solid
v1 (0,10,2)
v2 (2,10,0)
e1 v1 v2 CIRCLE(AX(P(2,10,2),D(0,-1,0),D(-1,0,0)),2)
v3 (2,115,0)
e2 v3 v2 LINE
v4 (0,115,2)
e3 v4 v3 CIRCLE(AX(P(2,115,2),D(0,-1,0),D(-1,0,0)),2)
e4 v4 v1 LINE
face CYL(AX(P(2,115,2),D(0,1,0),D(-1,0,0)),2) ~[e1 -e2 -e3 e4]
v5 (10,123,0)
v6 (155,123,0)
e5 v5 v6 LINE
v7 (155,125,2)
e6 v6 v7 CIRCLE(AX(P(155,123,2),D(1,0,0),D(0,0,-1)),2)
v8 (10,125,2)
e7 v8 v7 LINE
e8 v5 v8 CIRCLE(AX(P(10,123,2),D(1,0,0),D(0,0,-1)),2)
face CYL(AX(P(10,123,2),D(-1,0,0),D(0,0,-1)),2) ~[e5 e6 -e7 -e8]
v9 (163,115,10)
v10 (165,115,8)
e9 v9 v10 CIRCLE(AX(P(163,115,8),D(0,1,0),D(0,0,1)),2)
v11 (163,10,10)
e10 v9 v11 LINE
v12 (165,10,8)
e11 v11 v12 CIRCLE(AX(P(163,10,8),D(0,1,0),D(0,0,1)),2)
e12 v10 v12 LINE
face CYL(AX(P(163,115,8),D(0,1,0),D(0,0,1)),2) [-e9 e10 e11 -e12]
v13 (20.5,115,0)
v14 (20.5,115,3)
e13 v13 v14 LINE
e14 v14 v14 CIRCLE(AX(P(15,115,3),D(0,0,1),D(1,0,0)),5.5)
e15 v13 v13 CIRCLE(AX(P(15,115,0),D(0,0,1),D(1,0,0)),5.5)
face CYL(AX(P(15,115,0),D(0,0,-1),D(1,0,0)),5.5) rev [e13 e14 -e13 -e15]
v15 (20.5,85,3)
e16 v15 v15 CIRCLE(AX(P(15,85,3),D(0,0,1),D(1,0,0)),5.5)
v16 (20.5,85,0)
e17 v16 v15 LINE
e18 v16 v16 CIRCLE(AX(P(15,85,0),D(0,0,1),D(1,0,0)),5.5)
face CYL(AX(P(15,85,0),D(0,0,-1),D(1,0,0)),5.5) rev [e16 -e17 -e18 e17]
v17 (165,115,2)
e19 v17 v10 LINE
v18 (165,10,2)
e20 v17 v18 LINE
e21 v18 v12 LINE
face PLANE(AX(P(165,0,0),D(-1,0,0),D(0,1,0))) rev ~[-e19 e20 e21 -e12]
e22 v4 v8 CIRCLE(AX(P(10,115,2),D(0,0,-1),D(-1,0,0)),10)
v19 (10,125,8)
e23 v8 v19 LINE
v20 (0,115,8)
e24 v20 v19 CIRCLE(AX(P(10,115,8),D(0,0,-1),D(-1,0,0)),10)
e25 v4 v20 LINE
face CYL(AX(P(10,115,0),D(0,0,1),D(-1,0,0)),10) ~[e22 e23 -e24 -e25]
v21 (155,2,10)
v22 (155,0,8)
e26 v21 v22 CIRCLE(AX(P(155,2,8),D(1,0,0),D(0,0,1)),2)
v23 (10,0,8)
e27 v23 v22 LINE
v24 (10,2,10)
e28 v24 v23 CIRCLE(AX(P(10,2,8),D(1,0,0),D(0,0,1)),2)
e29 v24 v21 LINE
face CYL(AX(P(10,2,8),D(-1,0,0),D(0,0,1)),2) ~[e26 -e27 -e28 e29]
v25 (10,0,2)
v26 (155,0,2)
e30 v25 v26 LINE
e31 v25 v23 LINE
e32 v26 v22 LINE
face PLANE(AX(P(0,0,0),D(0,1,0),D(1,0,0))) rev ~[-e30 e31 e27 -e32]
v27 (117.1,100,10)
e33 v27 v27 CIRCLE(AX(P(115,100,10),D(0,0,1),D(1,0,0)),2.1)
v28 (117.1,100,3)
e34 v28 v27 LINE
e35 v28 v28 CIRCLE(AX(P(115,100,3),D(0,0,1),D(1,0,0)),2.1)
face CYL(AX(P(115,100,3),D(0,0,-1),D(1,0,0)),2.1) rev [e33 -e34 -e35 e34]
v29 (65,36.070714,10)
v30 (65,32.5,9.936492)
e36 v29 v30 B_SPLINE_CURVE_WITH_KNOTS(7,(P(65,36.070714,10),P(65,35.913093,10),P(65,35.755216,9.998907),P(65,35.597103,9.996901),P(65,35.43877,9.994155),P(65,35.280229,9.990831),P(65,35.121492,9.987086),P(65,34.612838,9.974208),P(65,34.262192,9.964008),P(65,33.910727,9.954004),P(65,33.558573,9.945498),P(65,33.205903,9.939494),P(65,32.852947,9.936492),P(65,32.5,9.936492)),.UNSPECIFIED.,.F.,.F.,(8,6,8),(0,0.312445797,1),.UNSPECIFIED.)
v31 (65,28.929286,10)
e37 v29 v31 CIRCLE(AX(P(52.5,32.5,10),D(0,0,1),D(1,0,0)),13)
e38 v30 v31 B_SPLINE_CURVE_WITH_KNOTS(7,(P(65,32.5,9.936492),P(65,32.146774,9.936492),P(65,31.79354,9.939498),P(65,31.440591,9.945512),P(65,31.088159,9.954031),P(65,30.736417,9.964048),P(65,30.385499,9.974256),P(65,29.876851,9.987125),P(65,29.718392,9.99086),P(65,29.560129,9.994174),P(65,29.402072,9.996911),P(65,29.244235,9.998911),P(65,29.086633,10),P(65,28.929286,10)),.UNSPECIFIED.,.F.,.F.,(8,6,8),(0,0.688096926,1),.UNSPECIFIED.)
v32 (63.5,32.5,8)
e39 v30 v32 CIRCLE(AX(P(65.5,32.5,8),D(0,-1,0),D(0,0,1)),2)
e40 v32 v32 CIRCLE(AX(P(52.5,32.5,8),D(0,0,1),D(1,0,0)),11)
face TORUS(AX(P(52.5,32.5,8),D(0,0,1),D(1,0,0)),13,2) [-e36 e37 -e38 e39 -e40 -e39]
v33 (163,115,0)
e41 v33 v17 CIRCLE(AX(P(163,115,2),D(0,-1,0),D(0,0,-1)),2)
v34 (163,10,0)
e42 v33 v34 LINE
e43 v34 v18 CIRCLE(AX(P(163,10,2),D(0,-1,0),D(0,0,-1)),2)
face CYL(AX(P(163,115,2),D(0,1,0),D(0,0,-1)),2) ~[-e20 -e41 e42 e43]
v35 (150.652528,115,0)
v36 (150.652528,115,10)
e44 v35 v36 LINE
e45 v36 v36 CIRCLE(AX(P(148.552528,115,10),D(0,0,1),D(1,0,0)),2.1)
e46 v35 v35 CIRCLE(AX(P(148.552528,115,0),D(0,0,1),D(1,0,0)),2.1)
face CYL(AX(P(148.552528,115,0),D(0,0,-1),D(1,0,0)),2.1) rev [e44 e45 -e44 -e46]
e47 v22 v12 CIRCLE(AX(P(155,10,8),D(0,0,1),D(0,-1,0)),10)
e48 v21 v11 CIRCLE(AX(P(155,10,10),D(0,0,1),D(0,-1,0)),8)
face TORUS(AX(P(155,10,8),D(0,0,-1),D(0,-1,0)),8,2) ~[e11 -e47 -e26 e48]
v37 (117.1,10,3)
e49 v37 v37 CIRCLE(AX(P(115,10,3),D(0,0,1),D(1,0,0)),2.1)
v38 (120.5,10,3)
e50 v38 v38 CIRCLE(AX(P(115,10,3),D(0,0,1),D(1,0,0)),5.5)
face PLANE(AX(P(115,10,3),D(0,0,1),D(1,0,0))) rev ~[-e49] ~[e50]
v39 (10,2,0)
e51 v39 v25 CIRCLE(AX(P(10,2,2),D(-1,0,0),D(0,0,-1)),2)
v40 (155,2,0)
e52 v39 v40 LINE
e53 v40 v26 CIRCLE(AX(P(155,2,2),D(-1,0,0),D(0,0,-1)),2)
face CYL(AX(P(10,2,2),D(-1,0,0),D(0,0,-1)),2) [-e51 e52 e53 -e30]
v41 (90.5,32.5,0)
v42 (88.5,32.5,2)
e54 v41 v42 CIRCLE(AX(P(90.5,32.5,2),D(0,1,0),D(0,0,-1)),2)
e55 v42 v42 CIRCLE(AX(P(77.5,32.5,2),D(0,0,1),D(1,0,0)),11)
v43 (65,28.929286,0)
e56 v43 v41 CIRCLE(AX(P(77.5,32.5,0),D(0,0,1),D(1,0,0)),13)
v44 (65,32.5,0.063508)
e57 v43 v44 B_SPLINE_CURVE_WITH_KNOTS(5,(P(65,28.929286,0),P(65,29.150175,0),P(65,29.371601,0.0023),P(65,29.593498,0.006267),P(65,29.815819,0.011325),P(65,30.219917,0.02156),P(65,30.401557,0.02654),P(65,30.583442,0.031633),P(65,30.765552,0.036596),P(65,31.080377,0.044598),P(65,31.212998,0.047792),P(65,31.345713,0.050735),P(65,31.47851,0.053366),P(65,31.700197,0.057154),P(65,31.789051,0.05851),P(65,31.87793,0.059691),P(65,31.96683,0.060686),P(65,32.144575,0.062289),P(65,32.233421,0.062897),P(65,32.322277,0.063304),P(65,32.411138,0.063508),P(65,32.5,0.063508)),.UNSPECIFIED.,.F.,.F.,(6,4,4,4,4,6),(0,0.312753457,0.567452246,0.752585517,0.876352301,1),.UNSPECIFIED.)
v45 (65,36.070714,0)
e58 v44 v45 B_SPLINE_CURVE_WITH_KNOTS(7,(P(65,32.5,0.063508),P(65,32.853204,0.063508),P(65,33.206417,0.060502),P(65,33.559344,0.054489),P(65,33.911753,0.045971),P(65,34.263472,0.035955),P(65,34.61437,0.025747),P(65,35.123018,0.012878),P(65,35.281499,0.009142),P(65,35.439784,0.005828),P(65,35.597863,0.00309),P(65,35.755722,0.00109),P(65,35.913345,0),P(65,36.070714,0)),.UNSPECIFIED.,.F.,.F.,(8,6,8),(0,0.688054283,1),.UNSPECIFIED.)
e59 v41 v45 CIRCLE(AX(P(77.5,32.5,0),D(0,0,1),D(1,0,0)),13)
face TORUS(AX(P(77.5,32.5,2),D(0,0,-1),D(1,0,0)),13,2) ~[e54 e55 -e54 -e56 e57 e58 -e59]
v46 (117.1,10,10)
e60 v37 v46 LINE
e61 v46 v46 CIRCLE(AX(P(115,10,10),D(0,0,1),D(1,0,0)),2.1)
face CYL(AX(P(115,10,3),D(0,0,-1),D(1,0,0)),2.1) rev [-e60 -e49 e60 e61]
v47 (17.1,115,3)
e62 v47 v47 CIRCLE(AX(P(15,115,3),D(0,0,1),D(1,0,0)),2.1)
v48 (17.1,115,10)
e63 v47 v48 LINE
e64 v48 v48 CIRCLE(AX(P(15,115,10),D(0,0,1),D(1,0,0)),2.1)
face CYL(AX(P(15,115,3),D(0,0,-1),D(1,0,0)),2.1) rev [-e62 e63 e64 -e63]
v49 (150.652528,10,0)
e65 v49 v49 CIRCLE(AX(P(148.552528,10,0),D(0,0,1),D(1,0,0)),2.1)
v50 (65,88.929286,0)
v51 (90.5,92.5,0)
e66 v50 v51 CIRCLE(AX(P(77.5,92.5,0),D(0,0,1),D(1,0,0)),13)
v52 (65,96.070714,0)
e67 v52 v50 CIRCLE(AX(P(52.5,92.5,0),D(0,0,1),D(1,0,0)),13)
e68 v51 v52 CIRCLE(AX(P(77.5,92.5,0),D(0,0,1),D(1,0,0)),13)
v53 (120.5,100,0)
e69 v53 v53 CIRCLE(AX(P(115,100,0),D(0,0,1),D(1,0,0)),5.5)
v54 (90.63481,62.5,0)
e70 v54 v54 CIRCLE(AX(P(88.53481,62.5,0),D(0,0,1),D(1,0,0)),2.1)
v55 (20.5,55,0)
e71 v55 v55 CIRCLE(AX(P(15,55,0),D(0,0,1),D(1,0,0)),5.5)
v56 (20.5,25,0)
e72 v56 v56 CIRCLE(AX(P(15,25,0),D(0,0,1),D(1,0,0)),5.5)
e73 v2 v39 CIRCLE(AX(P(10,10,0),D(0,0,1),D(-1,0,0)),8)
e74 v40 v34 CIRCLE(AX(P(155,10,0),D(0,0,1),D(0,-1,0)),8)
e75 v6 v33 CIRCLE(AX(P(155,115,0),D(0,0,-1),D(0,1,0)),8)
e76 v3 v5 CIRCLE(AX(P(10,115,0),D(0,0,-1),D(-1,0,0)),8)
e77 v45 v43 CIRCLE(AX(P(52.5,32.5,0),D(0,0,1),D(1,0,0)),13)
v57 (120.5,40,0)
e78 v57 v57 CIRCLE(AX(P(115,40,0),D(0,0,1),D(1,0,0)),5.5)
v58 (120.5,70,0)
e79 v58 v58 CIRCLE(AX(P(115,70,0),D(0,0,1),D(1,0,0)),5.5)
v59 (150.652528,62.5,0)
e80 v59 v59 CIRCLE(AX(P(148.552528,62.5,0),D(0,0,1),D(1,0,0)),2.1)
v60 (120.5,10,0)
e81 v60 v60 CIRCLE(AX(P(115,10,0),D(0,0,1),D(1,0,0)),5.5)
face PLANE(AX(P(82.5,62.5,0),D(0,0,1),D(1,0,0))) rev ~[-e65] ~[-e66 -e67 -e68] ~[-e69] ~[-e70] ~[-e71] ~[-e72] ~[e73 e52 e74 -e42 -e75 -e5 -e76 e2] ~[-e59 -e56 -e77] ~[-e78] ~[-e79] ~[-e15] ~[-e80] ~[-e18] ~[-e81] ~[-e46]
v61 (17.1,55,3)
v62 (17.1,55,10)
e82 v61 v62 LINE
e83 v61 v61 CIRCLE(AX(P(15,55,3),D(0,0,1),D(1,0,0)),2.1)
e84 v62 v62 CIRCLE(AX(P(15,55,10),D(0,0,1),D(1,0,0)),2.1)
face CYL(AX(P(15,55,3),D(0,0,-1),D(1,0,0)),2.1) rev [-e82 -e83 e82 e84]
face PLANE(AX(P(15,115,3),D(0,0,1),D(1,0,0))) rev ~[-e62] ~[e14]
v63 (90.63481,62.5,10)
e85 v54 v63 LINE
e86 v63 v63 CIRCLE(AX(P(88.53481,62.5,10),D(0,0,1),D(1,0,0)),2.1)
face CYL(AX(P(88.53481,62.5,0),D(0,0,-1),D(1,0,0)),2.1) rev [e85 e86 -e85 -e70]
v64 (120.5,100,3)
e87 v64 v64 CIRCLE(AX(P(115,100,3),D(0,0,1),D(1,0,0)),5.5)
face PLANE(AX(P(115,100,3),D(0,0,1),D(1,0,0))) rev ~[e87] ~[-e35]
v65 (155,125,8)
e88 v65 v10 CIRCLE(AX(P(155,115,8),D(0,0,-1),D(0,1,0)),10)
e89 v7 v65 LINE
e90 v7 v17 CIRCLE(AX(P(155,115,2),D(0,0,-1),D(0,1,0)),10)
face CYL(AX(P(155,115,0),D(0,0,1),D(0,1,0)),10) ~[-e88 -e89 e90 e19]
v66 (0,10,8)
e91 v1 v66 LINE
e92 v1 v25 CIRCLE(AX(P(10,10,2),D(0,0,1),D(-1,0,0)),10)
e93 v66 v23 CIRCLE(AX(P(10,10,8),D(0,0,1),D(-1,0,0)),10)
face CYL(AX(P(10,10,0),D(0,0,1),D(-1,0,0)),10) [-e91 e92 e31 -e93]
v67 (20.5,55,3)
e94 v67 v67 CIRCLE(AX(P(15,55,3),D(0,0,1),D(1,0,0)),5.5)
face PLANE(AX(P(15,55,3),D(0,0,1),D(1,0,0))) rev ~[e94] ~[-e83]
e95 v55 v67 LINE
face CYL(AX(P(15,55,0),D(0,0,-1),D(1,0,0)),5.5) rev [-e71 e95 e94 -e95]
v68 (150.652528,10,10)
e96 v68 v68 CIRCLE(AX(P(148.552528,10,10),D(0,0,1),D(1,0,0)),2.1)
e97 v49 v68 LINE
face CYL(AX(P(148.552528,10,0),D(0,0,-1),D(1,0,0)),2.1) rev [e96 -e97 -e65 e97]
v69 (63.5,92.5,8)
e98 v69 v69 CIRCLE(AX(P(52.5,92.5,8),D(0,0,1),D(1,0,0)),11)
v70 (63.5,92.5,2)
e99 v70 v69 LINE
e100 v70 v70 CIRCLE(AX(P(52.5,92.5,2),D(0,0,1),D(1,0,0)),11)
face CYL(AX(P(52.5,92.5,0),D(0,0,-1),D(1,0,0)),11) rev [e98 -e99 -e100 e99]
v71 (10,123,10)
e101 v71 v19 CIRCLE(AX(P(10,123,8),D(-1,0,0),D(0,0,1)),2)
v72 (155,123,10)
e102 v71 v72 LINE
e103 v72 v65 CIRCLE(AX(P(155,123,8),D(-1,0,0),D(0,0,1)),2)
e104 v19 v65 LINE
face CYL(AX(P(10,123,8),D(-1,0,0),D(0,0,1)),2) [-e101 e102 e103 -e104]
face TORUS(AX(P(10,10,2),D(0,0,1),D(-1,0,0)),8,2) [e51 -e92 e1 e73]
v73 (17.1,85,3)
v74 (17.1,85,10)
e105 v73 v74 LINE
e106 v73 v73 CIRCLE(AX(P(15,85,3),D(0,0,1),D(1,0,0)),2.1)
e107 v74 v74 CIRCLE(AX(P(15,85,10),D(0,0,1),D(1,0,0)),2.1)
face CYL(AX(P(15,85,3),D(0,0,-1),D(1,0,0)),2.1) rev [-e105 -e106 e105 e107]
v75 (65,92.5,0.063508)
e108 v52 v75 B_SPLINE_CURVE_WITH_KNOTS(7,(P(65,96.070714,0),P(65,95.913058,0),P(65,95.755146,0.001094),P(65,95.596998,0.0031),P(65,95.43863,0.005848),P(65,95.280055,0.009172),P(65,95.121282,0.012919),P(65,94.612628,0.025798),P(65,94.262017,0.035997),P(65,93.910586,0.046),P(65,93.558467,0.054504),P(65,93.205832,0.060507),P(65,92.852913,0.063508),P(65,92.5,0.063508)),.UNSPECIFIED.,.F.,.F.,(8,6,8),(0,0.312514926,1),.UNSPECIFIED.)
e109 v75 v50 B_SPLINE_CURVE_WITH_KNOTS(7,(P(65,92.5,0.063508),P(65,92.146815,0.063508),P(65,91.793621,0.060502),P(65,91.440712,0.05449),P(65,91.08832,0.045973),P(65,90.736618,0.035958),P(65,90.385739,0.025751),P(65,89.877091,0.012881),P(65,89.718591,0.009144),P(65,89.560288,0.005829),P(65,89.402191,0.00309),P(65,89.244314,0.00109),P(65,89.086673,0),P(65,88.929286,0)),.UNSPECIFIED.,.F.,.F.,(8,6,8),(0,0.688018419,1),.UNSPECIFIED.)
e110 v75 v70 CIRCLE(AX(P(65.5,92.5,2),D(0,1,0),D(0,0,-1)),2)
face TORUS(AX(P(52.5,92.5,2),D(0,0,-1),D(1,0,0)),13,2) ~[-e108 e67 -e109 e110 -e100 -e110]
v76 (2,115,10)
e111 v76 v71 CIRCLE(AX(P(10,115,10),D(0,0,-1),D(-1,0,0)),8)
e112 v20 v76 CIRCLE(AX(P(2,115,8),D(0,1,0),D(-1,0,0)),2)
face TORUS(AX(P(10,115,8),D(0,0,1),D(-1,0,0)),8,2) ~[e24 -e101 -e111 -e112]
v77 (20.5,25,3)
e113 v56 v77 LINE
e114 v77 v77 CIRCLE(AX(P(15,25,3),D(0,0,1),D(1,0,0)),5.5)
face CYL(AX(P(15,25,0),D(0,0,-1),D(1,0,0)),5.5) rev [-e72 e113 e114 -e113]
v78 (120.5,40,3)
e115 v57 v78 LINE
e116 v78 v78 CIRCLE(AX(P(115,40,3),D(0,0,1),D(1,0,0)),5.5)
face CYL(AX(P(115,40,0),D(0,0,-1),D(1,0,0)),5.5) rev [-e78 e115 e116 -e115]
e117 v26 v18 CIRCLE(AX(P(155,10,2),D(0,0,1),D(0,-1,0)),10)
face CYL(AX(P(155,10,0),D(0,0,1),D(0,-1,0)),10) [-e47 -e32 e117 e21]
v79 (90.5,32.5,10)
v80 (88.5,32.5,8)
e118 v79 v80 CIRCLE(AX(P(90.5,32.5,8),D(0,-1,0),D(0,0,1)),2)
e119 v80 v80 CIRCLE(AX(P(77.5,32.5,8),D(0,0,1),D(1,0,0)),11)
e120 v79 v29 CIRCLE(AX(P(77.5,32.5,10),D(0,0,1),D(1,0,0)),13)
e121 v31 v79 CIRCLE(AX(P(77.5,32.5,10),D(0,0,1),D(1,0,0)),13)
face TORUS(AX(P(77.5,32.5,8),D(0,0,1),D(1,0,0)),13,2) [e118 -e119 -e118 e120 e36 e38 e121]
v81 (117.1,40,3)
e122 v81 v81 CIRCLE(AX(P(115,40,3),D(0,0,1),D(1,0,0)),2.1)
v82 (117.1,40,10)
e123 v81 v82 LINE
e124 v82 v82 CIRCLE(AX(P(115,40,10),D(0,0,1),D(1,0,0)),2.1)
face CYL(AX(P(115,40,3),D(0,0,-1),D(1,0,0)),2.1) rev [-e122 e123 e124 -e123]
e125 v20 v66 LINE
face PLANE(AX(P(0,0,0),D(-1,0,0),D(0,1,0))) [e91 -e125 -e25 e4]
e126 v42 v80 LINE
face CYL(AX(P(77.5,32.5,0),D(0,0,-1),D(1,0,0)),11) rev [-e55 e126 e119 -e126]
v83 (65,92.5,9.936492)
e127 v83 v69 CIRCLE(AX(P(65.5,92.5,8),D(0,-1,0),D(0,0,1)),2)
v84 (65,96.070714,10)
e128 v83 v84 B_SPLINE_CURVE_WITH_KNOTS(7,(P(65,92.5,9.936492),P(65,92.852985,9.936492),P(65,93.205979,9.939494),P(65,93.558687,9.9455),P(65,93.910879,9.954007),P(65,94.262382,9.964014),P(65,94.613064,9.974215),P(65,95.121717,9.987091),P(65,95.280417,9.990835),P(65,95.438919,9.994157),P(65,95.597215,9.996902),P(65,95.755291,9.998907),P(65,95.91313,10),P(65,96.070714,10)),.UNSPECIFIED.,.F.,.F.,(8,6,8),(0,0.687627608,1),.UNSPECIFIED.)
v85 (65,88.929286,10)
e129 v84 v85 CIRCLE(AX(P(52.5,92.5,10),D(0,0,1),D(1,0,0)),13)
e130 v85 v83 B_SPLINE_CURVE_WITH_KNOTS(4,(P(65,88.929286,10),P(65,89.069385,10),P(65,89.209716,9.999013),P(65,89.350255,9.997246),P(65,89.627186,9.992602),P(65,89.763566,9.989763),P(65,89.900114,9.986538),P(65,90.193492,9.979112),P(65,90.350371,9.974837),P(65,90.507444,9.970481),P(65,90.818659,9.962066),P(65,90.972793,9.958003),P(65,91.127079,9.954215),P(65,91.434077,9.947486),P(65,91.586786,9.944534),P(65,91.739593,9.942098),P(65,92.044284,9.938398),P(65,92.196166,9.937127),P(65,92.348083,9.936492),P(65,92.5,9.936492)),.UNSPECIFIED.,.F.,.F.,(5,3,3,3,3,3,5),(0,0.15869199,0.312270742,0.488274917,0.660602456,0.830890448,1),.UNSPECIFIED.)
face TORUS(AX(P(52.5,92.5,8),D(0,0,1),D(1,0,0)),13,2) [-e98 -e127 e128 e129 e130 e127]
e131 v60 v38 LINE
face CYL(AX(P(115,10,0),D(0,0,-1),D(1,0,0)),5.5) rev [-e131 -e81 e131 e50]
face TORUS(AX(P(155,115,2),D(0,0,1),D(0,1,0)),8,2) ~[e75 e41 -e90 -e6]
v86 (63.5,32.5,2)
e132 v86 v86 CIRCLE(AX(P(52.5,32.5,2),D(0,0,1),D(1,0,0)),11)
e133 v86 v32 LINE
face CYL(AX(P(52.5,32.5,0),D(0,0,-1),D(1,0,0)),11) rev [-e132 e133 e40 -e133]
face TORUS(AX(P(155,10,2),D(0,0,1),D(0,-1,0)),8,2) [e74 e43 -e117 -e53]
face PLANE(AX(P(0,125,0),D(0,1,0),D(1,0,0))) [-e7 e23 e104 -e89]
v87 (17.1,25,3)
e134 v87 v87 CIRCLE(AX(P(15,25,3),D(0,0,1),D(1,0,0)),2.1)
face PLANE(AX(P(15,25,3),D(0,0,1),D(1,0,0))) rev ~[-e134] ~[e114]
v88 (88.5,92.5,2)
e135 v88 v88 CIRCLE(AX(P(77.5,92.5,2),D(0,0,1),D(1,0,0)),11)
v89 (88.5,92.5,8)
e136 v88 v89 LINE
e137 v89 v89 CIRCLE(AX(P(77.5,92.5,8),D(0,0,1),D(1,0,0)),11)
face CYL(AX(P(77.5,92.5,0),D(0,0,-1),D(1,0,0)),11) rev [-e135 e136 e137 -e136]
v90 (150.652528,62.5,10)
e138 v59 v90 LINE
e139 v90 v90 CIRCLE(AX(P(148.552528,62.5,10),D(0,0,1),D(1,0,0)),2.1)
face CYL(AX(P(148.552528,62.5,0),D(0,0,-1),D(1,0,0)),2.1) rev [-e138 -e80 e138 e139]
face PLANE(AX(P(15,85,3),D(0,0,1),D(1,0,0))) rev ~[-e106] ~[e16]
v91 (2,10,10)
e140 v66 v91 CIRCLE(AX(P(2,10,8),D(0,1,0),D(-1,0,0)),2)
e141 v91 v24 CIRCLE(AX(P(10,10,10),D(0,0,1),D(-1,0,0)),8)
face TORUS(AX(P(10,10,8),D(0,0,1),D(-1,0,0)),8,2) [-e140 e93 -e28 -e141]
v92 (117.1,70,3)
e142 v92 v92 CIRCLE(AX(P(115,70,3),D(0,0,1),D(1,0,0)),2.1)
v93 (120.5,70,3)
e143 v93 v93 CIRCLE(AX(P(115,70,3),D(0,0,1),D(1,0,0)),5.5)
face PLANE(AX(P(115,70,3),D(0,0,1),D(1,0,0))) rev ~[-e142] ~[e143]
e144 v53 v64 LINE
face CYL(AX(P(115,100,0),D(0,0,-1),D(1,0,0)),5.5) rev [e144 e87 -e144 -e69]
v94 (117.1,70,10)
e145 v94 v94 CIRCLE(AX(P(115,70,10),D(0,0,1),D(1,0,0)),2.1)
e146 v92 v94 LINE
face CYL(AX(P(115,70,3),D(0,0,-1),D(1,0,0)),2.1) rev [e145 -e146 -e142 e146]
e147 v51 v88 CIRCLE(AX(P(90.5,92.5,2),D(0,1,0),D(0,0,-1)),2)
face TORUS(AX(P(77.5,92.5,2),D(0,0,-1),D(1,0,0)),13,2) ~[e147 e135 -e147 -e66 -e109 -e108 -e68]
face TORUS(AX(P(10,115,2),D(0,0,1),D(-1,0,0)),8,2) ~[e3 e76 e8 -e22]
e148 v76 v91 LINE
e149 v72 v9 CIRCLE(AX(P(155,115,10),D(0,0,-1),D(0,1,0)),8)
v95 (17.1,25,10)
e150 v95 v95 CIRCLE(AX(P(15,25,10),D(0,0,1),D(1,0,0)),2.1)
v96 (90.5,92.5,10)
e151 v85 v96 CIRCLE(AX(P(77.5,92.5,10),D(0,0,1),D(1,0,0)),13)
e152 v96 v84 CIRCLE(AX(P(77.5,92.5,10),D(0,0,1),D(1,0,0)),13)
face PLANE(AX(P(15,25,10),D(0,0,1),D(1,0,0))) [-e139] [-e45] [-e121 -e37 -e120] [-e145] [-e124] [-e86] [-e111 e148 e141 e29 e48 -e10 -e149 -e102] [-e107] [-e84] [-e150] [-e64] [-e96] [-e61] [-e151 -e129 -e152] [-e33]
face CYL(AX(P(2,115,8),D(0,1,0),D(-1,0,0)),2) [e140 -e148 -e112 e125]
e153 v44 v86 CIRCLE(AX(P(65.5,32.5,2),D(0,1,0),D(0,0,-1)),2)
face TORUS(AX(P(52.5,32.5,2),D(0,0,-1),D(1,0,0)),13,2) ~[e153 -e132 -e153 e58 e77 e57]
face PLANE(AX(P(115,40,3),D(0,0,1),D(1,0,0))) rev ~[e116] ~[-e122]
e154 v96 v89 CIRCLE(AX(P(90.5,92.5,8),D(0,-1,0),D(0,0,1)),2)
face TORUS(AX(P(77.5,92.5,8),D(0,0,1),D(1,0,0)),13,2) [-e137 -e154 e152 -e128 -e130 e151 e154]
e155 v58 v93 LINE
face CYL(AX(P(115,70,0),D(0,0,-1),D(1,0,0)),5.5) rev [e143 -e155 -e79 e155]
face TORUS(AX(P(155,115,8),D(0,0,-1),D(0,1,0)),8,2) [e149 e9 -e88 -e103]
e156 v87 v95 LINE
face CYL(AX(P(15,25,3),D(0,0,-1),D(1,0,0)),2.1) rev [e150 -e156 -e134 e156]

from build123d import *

# Parameters (mm, degrees)
F0_W         = 165
F0_H         = 125
F0_R         = 5.5
F0_R_2       = 11
F0_R_3       = 2.1
F1_DEPTH     = 10
F2_START     = 3
F2_DEPTH     = 7
F3_R         = 10
F4_T1_DEPTH  = 145
F4_T3_DEPTH  = 105
F4_T22_ANGLE = 90
F4_T24_ANGLE = 90
F4_T26_ANGLE = 90
F4_T28_ANGLE = 90
F4_T30_ANGLE = 90
F4_T32_ANGLE = 90
F4_T34_ANGLE = 90
F4_T36_ANGLE = 90


# Not quite as in the source:
# - a fillet or chamfer that OpenCascade refuses, or shapes differently, is made with other operations: its cross-section is extruded or revolved along the edge and cut away or added


with BuildPart() as f1:
    # F0 (on Top) → F1 (new body)
    with BuildSketch(Plane.XY):
        with Locations((82.5, 62.5)):
            Rectangle(F0_W, F0_H)
        with Locations((15, 25)):
            Circle(F0_R, mode=Mode.SUBTRACT)
        with Locations((15, 55)):
            Circle(F0_R, mode=Mode.SUBTRACT)
        with Locations((52.5, 32.5)):
            Circle(F0_R_2, mode=Mode.SUBTRACT)
        with Locations((77.5, 32.5)):
            Circle(F0_R_2, mode=Mode.SUBTRACT)
        with Locations((115, 10)):
            Circle(F0_R, mode=Mode.SUBTRACT)
        with Locations((148.5525276512, 10)):
            Circle(F0_R_3, mode=Mode.SUBTRACT)
        with Locations((115, 40)):
            Circle(F0_R, mode=Mode.SUBTRACT)
        with Locations((15, 85)):
            Circle(F0_R, mode=Mode.SUBTRACT)
        with Locations((52.5, 92.5)):
            Circle(F0_R_2, mode=Mode.SUBTRACT)
        with Locations((77.5, 92.5)):
            Circle(F0_R_2, mode=Mode.SUBTRACT)
        with Locations((15, 115)):
            Circle(F0_R, mode=Mode.SUBTRACT)
        with Locations((88.534809649, 62.5)):
            Circle(F0_R_3, mode=Mode.SUBTRACT)
        with Locations((115, 70)):
            Circle(F0_R, mode=Mode.SUBTRACT)
        with Locations((148.5525276512, 62.5)):
            Circle(F0_R_3, mode=Mode.SUBTRACT)
        with Locations((115, 100)):
            Circle(F0_R, mode=Mode.SUBTRACT)
        with Locations((148.5525276512, 115)):
            Circle(F0_R_3, mode=Mode.SUBTRACT)
    extrude(amount=F1_DEPTH)

    # F0 (on Top) → F2 (join)
    with BuildSketch(Plane.XY.offset(F2_START)):
        with Locations((15, 25)):
            Circle(F0_R)
        with Locations((15, 25)):
            Circle(F0_R_3, mode=Mode.SUBTRACT)
        with Locations((15, 55)):
            Circle(F0_R)
        with Locations((15, 55)):
            Circle(F0_R_3, mode=Mode.SUBTRACT)
        with Locations((115, 10)):
            Circle(F0_R)
        with Locations((115, 10)):
            Circle(F0_R_3, mode=Mode.SUBTRACT)
        with Locations((115, 40)):
            Circle(F0_R)
        with Locations((115, 40)):
            Circle(F0_R_3, mode=Mode.SUBTRACT)
        with Locations((115, 100)):
            Circle(F0_R)
        with Locations((115, 100)):
            Circle(F0_R_3, mode=Mode.SUBTRACT)
        with Locations((115, 70)):
            Circle(F0_R)
        with Locations((115, 70)):
            Circle(F0_R_3, mode=Mode.SUBTRACT)
        with Locations((15, 85)):
            Circle(F0_R)
        with Locations((15, 85)):
            Circle(F0_R_3, mode=Mode.SUBTRACT)
        with Locations((15, 115)):
            Circle(F0_R)
        with Locations((15, 115)):
            Circle(F0_R_3, mode=Mode.SUBTRACT)
    extrude(amount=F2_DEPTH)

    # F3
    f3_edges = [f1.edges().sort_by_distance(p)[0] for p in [
        (165, 0, 5),
        (165, 125, 5),
        (0, 125, 5),
        (0, 0, 5),
    ]]
    fillet(f3_edges, radius=F3_R)

    # F4: fillet of radius 2 on 20 edges, made by hand

    # F4_s2 → F4_t1 (cut)
    with BuildSketch(Plane.YZ.offset(10)):
        with BuildLine():
            ThreePointArc((2, 10), (0.5857864376, 9.4142135624), (0, 8))
            Line((0, 8), (0, 10))
            Line((0, 10), (2, 10))
        make_face()
        with BuildLine():
            ThreePointArc((2, 0), (0.5857864376, 0.5857864376), (0, 2))
            Line((0, 2), (0, 0))
            Line((0, 0), (2, 0))
        make_face()
        with BuildLine():
            ThreePointArc((123, 10), (124.4142135624, 9.4142135624), (125, 8))
            Line((125, 8), (125, 10))
            Line((125, 10), (123, 10))
        make_face()
        with BuildLine():
            ThreePointArc((123, 0), (124.4142135624, 0.5857864376), (125, 2))
            Line((125, 2), (125, 0))
            Line((125, 0), (123, 0))
        make_face()
    extrude(amount=F4_T1_DEPTH, mode=Mode.SUBTRACT)

    # F4_s4 → F4_t3 (cut)
    with BuildSketch(Plane.XZ.offset(-115)):
        with BuildLine():
            ThreePointArc((0, 8), (0.5857864376, 9.4142135624), (2, 10))
            Line((2, 10), (0, 10))
            Line((0, 10), (0, 8))
        make_face()
        with BuildLine():
            ThreePointArc((163, 10), (164.4142135624, 9.4142135624), (165, 8))
            Line((165, 8), (165, 10))
            Line((165, 10), (163, 10))
        make_face()
        with BuildLine():
            ThreePointArc((163, 0), (164.4142135624, 0.5857864376), (165, 2))
            Line((165, 2), (165, 0))
            Line((165, 0), (163, 0))
        make_face()
        with BuildLine():
            ThreePointArc((0, 2), (0.5857864376, 0.5857864376), (2, 0))
            Line((2, 0), (0, 0))
            Line((0, 0), (0, 2))
        make_face()
    extrude(amount=F4_T3_DEPTH, mode=Mode.SUBTRACT)

    # F4_s5 → F4_t6 (revolve, cut)
    with BuildSketch(Plane.XZ.offset(-32.5)):
        with BuildLine():
            ThreePointArc((65.5, 0), (64.0857864376, 0.5857864376), (63.5, 2))
            Line((63.5, 2), (63.5, 0))
            Line((63.5, 0), (65.5, 0))
        make_face()
    revolve(axis=Axis((52.5, 32.5, 0), (0, 0, 1)), mode=Mode.SUBTRACT)

    # F4_s7 → F4_t8 (revolve, cut)
    with BuildSketch(Plane.XZ.offset(-32.5)):
        with BuildLine():
            ThreePointArc((65.5, 10), (64.0857864376, 9.4142135624), (63.5, 8))
            Line((63.5, 8), (63.5, 10))
            Line((63.5, 10), (65.5, 10))
        make_face()
    revolve(axis=Axis((52.5, 32.5, 10), (0, 0, 1)), mode=Mode.SUBTRACT)

    # F4_s9 → F4_t10 (revolve, cut)
    with BuildSketch(Plane.XZ.offset(-32.5)):
        with BuildLine():
            ThreePointArc((90.5, 0), (89.0857864376, 0.5857864376), (88.5, 2))
            Line((88.5, 2), (88.5, 0))
            Line((88.5, 0), (90.5, 0))
        make_face()
    revolve(axis=Axis((77.5, 32.5, 0), (0, 0, 1)), mode=Mode.SUBTRACT)

    # F4_s11 → F4_t12 (revolve, cut)
    with BuildSketch(Plane.XZ.offset(-32.5)):
        with BuildLine():
            ThreePointArc((90.5, 10), (89.0857864376, 9.4142135624), (88.5, 8))
            Line((88.5, 8), (88.5, 10))
            Line((88.5, 10), (90.5, 10))
        make_face()
    revolve(axis=Axis((77.5, 32.5, 10), (0, 0, 1)), mode=Mode.SUBTRACT)

    # F4_s13 → F4_t14 (revolve, cut)
    with BuildSketch(Plane.XZ.offset(-92.5)):
        with BuildLine():
            ThreePointArc((90.5, 0), (89.0857864376, 0.5857864376), (88.5, 2))
            Line((88.5, 2), (88.5, 0))
            Line((88.5, 0), (90.5, 0))
        make_face()
    revolve(axis=Axis((77.5, 92.5, 0), (0, 0, 1)), mode=Mode.SUBTRACT)

    # F4_s15 → F4_t16 (revolve, cut)
    with BuildSketch(Plane.XZ.offset(-92.5)):
        with BuildLine():
            ThreePointArc((90.5, 10), (89.0857864376, 9.4142135624), (88.5, 8))
            Line((88.5, 8), (88.5, 10))
            Line((88.5, 10), (90.5, 10))
        make_face()
    revolve(axis=Axis((77.5, 92.5, 10), (0, 0, 1)), mode=Mode.SUBTRACT)

    # F4_s17 → F4_t18 (revolve, cut)
    with BuildSketch(Plane.XZ.offset(-92.5)):
        with BuildLine():
            ThreePointArc((65.5, 0), (64.0857864376, 0.5857864376), (63.5, 2))
            Line((63.5, 2), (63.5, 0))
            Line((63.5, 0), (65.5, 0))
        make_face()
    revolve(axis=Axis((52.5, 92.5, 0), (0, 0, 1)), mode=Mode.SUBTRACT)

    # F4_s19 → F4_t20 (revolve, cut)
    with BuildSketch(Plane.XZ.offset(-92.5)):
        with BuildLine():
            ThreePointArc((65.5, 10), (64.0857864376, 9.4142135624), (63.5, 8))
            Line((63.5, 8), (63.5, 10))
            Line((63.5, 10), (65.5, 10))
        make_face()
    revolve(axis=Axis((52.5, 92.5, 10), (0, 0, 1)), mode=Mode.SUBTRACT)

    # F4_s21 → F4_t22 (revolve, cut)
    with BuildSketch(Plane.YZ.offset(155)):
        with BuildLine():
            ThreePointArc((123, 0), (124.4142135624, 0.5857864376), (125, 2))
            Line((125, 2), (125, 0))
            Line((125, 0), (123, 0))
        make_face()
    revolve(axis=Axis((155, 115, 0), (0, 0, -1)), revolution_arc=F4_T22_ANGLE, mode=Mode.SUBTRACT)

    # F4_s23 → F4_t24 (revolve, cut)
    with BuildSketch(Plane.XZ.offset(-115)):
        with BuildLine():
            ThreePointArc((2, 0), (0.5857864376, 0.5857864376), (0, 2))
            Line((0, 2), (0, 0))
            Line((0, 0), (2, 0))
        make_face()
    revolve(axis=Axis((10, 115, 0), (0, 0, -1)), revolution_arc=F4_T24_ANGLE, mode=Mode.SUBTRACT)

    # F4_s25 → F4_t26 (revolve, cut)
    with BuildSketch(Plane.XZ.offset(-10)):
        with BuildLine():
            ThreePointArc((2, 0), (0.5857864376, 0.5857864376), (0, 2))
            Line((0, 2), (0, 0))
            Line((0, 0), (2, 0))
        make_face()
    revolve(axis=Axis((10, 10, 0), (0, 0, 1)), revolution_arc=F4_T26_ANGLE, mode=Mode.SUBTRACT)

    # F4_s27 → F4_t28 (revolve, cut)
    with BuildSketch(Plane.YZ.offset(155)):
        with BuildLine():
            ThreePointArc((2, 0), (0.5857864376, 0.5857864376), (0, 2))
            Line((0, 2), (0, 0))
            Line((0, 0), (2, 0))
        make_face()
    revolve(axis=Axis((155, 10, 0), (0, 0, 1)), revolution_arc=F4_T28_ANGLE, mode=Mode.SUBTRACT)

    # F4_s29 → F4_t30 (revolve, cut)
    with BuildSketch(Plane.YZ.offset(155)):
        with BuildLine():
            ThreePointArc((2, 10), (0.5857864376, 9.4142135624), (0, 8))
            Line((0, 8), (0, 10))
            Line((0, 10), (2, 10))
        make_face()
    revolve(axis=Axis((155, 10, 10), (0, 0, 1)), revolution_arc=F4_T30_ANGLE, mode=Mode.SUBTRACT)

    # F4_s31 → F4_t32 (revolve, cut)
    with BuildSketch(Plane.YZ.offset(155)):
        with BuildLine():
            ThreePointArc((123, 10), (124.4142135624, 9.4142135624), (125, 8))
            Line((125, 8), (125, 10))
            Line((125, 10), (123, 10))
        make_face()
    revolve(axis=Axis((155, 115, 10), (0, 0, -1)), revolution_arc=F4_T32_ANGLE, mode=Mode.SUBTRACT)

    # F4_s33 → F4_t34 (revolve, cut)
    with BuildSketch(Plane.XZ.offset(-115)):
        with BuildLine():
            ThreePointArc((0, 8), (0.5857864376, 9.4142135624), (2, 10))
            Line((2, 10), (0, 10))
            Line((0, 10), (0, 8))
        make_face()
    revolve(axis=Axis((10, 115, 10), (0, 0, -1)), revolution_arc=F4_T34_ANGLE, mode=Mode.SUBTRACT)

    # F4_s35 → F4_t36 (revolve, cut)
    with BuildSketch(Plane.XZ.offset(-10)):
        with BuildLine():
            ThreePointArc((0, 8), (0.5857864376, 9.4142135624), (2, 10))
            Line((2, 10), (0, 10))
            Line((0, 10), (0, 8))
        make_face()
    revolve(axis=Axis((10, 10, 10), (0, 0, 1)), revolution_arc=F4_T36_ANGLE, mode=Mode.SUBTRACT)


solid = f1.part
